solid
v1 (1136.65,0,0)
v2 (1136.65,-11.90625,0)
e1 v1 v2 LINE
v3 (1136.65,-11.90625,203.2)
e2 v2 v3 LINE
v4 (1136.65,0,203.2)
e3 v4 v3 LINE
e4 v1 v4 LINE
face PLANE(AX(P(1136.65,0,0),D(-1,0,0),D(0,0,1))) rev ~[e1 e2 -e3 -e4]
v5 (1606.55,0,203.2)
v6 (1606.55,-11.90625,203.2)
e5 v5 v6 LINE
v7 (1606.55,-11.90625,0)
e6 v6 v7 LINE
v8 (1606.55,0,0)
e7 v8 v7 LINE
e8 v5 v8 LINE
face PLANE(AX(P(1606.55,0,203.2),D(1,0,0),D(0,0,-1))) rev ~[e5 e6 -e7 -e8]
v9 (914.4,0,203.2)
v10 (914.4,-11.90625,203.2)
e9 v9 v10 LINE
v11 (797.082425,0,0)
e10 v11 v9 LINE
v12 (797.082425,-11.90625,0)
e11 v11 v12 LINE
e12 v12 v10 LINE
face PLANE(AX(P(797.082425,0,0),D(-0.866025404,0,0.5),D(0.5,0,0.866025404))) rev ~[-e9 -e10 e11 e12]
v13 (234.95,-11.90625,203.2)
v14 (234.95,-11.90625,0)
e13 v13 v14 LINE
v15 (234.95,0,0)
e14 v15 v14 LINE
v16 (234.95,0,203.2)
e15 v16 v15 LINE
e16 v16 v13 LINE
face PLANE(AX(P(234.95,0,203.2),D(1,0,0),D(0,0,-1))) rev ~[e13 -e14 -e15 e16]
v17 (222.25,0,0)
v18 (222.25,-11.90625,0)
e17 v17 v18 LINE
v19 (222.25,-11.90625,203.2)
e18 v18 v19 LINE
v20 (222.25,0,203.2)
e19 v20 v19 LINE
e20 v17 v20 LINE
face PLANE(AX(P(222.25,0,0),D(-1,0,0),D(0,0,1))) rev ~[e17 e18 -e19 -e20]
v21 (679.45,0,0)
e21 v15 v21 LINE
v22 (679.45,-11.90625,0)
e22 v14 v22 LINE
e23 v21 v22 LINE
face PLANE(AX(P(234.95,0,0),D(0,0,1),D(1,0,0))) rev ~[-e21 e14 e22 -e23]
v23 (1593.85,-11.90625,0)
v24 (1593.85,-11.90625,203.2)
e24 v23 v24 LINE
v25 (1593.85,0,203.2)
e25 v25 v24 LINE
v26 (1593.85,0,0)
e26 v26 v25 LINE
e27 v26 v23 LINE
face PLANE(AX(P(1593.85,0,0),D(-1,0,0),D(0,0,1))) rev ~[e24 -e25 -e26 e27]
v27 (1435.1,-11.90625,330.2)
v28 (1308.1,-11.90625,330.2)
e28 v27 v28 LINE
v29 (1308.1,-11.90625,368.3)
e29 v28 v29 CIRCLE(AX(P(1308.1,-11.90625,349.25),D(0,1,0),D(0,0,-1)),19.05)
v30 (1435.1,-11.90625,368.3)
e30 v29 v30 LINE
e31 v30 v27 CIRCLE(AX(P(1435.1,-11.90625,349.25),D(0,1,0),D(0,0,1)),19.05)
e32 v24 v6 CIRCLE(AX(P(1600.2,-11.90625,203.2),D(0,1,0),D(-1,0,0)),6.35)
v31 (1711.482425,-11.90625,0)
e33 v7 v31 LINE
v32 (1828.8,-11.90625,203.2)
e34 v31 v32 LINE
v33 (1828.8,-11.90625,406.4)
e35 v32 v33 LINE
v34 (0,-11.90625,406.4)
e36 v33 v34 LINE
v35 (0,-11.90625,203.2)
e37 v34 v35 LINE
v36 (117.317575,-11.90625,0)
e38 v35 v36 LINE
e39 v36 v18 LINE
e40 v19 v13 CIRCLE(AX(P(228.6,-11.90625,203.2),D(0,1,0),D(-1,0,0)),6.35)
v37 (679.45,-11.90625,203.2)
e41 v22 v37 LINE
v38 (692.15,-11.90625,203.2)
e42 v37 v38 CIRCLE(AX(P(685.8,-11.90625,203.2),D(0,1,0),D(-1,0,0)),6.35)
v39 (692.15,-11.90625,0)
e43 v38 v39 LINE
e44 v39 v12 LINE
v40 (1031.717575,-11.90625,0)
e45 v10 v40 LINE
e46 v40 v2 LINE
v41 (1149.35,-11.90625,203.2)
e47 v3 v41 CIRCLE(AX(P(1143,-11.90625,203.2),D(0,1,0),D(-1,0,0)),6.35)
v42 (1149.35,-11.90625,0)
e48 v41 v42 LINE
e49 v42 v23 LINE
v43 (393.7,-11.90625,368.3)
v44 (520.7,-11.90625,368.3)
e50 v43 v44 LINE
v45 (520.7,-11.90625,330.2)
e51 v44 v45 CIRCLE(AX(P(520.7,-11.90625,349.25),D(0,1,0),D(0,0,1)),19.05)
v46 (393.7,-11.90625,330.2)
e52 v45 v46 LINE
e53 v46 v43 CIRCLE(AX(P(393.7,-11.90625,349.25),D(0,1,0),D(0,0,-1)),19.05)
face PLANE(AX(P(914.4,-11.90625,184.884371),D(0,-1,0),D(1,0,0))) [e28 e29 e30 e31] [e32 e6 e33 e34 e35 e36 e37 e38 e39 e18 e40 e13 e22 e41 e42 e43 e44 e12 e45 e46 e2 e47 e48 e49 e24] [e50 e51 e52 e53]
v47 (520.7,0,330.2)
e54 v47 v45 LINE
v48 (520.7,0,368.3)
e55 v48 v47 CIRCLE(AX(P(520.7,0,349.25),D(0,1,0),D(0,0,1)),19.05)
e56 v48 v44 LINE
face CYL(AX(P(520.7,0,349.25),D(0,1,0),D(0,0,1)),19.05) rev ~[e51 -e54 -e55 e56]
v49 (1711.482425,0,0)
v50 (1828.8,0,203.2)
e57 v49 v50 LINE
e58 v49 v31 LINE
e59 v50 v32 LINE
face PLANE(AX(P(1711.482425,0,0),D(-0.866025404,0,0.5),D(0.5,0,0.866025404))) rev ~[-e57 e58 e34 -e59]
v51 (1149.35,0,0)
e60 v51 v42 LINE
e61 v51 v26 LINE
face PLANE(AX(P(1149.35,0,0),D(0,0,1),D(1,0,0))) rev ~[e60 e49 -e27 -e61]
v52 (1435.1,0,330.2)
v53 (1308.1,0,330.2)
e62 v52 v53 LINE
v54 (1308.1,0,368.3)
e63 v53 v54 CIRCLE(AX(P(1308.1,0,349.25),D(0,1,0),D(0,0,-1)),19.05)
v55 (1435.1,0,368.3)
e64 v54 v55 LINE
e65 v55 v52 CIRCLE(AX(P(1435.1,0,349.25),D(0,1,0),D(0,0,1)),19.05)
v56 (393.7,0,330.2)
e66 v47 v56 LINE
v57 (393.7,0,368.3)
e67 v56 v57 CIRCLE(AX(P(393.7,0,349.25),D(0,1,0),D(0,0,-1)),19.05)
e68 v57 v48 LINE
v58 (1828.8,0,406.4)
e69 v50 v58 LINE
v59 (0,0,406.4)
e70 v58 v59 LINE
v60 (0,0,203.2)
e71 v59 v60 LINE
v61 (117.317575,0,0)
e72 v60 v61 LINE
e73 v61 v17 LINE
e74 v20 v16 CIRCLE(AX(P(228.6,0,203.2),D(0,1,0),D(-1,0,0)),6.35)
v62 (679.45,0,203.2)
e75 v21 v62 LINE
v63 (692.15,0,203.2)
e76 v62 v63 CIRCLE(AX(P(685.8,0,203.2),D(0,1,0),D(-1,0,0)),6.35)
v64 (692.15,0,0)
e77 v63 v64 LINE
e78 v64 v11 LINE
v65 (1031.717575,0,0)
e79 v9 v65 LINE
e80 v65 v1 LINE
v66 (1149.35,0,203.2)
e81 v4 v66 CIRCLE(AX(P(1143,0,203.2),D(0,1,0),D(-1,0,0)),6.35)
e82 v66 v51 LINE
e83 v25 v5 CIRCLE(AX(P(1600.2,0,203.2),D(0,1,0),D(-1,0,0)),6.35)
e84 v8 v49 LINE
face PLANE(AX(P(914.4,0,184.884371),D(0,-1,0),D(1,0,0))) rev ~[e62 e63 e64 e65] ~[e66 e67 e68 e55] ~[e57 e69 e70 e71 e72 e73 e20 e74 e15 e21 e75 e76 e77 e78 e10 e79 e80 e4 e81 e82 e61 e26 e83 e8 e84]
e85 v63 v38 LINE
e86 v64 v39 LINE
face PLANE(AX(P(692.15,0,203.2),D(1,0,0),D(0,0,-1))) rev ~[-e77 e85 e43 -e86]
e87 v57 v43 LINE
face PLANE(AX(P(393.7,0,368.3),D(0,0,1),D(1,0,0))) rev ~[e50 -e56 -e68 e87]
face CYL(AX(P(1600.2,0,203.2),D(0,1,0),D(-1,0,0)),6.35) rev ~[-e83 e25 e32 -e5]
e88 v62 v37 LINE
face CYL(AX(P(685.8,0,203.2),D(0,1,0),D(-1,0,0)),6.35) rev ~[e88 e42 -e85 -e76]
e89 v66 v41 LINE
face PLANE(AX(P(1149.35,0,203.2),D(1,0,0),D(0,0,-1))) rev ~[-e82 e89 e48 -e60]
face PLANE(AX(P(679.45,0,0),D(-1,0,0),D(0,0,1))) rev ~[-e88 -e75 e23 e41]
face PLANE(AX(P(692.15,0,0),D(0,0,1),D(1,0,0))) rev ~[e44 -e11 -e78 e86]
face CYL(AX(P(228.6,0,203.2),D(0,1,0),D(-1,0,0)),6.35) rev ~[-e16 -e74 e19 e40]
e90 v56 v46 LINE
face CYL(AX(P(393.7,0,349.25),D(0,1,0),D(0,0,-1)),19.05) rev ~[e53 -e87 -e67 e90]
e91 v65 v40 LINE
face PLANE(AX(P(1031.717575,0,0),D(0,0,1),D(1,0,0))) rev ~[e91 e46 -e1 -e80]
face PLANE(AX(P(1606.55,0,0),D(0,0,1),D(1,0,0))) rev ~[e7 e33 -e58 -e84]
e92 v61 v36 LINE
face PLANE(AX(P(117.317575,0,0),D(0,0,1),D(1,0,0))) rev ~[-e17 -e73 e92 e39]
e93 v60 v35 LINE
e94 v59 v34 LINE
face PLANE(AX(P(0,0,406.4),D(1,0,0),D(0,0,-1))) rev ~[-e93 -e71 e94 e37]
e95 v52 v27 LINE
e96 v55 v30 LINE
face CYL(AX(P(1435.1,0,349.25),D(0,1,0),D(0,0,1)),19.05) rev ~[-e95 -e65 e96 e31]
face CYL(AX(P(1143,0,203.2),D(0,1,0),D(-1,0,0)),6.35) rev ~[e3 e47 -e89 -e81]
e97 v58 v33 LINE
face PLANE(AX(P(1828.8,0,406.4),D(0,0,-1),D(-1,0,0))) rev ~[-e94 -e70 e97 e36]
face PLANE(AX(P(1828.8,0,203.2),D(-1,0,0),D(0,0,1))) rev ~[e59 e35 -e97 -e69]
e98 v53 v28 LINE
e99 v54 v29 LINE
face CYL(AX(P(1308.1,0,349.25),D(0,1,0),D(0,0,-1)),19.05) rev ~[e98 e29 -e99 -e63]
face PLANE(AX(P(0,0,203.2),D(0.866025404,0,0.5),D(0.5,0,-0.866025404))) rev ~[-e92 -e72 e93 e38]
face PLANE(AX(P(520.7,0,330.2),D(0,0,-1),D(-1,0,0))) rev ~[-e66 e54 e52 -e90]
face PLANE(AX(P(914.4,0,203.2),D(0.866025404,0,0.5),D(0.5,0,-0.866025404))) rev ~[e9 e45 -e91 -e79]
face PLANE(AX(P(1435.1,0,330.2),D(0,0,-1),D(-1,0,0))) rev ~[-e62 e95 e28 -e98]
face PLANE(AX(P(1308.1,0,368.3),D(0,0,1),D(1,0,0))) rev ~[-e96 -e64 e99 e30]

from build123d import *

# Parameters (mm, degrees)
F2_DEPTH = 11.90625


# Not quite as in the source:
# - a variable given as a bare number and used for a length is read in inches; the dataset says mm whatever the document's units were


with BuildPart() as f2:
    # F1 (on Front) → F2 (new body)
    with BuildSketch(Plane.XZ):
        with BuildLine():
            Line((914.4, 406.4), (0, 406.4))
            Line((0, 406.4), (0, 203.2))
            Line((0, 203.2), (117.3175746993, 0))
            Line((117.3175746993, 0), (222.25, 0))
            Line((222.25, 0), (222.25, 203.2))
            ThreePointArc((222.25, 203.2), (228.6, 209.55), (234.95, 203.2))
            Line((234.95, 203.2), (234.95, 0))
            Line((234.95, 0), (679.45, 0))
            Line((679.45, 0), (679.45, 203.2))
            ThreePointArc((679.45, 203.2), (685.8, 209.55), (692.15, 203.2))
            Line((692.15, 203.2), (692.15, 0))
            Line((692.15, 0), (797.0824253007, 0))
            Line((797.0824253007, 0), (914.4, 203.2))
            Line((914.4, 203.2), (1031.7175746993, 0))
            Line((1031.7175746993, 0), (1136.65, 0))
            Line((1136.65, 0), (1136.65, 203.2))
            ThreePointArc((1136.65, 203.2), (1143, 209.55), (1149.35, 203.2))
            Line((1149.35, 203.2), (1149.35, 0))
            Line((1149.35, 0), (1593.85, 0))
            Line((1593.85, 0), (1593.85, 203.2))
            ThreePointArc((1593.85, 203.2), (1600.2, 209.55), (1606.55, 203.2))
            Line((1606.55, 203.2), (1606.55, 0))
            Line((1606.55, 0), (1711.4824253007, 0))
            Line((1711.4824253007, 0), (1828.8, 203.2))
            Line((1828.8, 203.2), (1828.8, 406.4))
            Line((1828.8, 406.4), (914.4, 406.4))
        make_face()
        with BuildLine():
            Line((393.7, 368.3), (457.2, 368.3))
            Line((457.2, 368.3), (520.7, 368.3))
            ThreePointArc((520.7, 368.3), (539.75, 349.25), (520.7, 330.2))
            Line((520.7, 330.2), (457.2, 330.2))
            Line((457.2, 330.2), (393.7, 330.2))
            ThreePointArc((393.7, 330.2), (374.65, 349.25), (393.7, 368.3))
        make_face(mode=Mode.SUBTRACT)
        with BuildLine():
            Line((1308.1, 368.3), (1371.6, 368.3))
            Line((1371.6, 368.3), (1435.1, 368.3))
            ThreePointArc((1435.1, 368.3), (1454.15, 349.25), (1435.1, 330.2))
            Line((1435.1, 330.2), (1371.6, 330.2))
            Line((1371.6, 330.2), (1308.1, 330.2))
            ThreePointArc((1308.1, 330.2), (1289.05, 349.25), (1308.1, 368.3))
        make_face(mode=Mode.SUBTRACT)
    extrude(amount=F2_DEPTH)


solid = f2.part
